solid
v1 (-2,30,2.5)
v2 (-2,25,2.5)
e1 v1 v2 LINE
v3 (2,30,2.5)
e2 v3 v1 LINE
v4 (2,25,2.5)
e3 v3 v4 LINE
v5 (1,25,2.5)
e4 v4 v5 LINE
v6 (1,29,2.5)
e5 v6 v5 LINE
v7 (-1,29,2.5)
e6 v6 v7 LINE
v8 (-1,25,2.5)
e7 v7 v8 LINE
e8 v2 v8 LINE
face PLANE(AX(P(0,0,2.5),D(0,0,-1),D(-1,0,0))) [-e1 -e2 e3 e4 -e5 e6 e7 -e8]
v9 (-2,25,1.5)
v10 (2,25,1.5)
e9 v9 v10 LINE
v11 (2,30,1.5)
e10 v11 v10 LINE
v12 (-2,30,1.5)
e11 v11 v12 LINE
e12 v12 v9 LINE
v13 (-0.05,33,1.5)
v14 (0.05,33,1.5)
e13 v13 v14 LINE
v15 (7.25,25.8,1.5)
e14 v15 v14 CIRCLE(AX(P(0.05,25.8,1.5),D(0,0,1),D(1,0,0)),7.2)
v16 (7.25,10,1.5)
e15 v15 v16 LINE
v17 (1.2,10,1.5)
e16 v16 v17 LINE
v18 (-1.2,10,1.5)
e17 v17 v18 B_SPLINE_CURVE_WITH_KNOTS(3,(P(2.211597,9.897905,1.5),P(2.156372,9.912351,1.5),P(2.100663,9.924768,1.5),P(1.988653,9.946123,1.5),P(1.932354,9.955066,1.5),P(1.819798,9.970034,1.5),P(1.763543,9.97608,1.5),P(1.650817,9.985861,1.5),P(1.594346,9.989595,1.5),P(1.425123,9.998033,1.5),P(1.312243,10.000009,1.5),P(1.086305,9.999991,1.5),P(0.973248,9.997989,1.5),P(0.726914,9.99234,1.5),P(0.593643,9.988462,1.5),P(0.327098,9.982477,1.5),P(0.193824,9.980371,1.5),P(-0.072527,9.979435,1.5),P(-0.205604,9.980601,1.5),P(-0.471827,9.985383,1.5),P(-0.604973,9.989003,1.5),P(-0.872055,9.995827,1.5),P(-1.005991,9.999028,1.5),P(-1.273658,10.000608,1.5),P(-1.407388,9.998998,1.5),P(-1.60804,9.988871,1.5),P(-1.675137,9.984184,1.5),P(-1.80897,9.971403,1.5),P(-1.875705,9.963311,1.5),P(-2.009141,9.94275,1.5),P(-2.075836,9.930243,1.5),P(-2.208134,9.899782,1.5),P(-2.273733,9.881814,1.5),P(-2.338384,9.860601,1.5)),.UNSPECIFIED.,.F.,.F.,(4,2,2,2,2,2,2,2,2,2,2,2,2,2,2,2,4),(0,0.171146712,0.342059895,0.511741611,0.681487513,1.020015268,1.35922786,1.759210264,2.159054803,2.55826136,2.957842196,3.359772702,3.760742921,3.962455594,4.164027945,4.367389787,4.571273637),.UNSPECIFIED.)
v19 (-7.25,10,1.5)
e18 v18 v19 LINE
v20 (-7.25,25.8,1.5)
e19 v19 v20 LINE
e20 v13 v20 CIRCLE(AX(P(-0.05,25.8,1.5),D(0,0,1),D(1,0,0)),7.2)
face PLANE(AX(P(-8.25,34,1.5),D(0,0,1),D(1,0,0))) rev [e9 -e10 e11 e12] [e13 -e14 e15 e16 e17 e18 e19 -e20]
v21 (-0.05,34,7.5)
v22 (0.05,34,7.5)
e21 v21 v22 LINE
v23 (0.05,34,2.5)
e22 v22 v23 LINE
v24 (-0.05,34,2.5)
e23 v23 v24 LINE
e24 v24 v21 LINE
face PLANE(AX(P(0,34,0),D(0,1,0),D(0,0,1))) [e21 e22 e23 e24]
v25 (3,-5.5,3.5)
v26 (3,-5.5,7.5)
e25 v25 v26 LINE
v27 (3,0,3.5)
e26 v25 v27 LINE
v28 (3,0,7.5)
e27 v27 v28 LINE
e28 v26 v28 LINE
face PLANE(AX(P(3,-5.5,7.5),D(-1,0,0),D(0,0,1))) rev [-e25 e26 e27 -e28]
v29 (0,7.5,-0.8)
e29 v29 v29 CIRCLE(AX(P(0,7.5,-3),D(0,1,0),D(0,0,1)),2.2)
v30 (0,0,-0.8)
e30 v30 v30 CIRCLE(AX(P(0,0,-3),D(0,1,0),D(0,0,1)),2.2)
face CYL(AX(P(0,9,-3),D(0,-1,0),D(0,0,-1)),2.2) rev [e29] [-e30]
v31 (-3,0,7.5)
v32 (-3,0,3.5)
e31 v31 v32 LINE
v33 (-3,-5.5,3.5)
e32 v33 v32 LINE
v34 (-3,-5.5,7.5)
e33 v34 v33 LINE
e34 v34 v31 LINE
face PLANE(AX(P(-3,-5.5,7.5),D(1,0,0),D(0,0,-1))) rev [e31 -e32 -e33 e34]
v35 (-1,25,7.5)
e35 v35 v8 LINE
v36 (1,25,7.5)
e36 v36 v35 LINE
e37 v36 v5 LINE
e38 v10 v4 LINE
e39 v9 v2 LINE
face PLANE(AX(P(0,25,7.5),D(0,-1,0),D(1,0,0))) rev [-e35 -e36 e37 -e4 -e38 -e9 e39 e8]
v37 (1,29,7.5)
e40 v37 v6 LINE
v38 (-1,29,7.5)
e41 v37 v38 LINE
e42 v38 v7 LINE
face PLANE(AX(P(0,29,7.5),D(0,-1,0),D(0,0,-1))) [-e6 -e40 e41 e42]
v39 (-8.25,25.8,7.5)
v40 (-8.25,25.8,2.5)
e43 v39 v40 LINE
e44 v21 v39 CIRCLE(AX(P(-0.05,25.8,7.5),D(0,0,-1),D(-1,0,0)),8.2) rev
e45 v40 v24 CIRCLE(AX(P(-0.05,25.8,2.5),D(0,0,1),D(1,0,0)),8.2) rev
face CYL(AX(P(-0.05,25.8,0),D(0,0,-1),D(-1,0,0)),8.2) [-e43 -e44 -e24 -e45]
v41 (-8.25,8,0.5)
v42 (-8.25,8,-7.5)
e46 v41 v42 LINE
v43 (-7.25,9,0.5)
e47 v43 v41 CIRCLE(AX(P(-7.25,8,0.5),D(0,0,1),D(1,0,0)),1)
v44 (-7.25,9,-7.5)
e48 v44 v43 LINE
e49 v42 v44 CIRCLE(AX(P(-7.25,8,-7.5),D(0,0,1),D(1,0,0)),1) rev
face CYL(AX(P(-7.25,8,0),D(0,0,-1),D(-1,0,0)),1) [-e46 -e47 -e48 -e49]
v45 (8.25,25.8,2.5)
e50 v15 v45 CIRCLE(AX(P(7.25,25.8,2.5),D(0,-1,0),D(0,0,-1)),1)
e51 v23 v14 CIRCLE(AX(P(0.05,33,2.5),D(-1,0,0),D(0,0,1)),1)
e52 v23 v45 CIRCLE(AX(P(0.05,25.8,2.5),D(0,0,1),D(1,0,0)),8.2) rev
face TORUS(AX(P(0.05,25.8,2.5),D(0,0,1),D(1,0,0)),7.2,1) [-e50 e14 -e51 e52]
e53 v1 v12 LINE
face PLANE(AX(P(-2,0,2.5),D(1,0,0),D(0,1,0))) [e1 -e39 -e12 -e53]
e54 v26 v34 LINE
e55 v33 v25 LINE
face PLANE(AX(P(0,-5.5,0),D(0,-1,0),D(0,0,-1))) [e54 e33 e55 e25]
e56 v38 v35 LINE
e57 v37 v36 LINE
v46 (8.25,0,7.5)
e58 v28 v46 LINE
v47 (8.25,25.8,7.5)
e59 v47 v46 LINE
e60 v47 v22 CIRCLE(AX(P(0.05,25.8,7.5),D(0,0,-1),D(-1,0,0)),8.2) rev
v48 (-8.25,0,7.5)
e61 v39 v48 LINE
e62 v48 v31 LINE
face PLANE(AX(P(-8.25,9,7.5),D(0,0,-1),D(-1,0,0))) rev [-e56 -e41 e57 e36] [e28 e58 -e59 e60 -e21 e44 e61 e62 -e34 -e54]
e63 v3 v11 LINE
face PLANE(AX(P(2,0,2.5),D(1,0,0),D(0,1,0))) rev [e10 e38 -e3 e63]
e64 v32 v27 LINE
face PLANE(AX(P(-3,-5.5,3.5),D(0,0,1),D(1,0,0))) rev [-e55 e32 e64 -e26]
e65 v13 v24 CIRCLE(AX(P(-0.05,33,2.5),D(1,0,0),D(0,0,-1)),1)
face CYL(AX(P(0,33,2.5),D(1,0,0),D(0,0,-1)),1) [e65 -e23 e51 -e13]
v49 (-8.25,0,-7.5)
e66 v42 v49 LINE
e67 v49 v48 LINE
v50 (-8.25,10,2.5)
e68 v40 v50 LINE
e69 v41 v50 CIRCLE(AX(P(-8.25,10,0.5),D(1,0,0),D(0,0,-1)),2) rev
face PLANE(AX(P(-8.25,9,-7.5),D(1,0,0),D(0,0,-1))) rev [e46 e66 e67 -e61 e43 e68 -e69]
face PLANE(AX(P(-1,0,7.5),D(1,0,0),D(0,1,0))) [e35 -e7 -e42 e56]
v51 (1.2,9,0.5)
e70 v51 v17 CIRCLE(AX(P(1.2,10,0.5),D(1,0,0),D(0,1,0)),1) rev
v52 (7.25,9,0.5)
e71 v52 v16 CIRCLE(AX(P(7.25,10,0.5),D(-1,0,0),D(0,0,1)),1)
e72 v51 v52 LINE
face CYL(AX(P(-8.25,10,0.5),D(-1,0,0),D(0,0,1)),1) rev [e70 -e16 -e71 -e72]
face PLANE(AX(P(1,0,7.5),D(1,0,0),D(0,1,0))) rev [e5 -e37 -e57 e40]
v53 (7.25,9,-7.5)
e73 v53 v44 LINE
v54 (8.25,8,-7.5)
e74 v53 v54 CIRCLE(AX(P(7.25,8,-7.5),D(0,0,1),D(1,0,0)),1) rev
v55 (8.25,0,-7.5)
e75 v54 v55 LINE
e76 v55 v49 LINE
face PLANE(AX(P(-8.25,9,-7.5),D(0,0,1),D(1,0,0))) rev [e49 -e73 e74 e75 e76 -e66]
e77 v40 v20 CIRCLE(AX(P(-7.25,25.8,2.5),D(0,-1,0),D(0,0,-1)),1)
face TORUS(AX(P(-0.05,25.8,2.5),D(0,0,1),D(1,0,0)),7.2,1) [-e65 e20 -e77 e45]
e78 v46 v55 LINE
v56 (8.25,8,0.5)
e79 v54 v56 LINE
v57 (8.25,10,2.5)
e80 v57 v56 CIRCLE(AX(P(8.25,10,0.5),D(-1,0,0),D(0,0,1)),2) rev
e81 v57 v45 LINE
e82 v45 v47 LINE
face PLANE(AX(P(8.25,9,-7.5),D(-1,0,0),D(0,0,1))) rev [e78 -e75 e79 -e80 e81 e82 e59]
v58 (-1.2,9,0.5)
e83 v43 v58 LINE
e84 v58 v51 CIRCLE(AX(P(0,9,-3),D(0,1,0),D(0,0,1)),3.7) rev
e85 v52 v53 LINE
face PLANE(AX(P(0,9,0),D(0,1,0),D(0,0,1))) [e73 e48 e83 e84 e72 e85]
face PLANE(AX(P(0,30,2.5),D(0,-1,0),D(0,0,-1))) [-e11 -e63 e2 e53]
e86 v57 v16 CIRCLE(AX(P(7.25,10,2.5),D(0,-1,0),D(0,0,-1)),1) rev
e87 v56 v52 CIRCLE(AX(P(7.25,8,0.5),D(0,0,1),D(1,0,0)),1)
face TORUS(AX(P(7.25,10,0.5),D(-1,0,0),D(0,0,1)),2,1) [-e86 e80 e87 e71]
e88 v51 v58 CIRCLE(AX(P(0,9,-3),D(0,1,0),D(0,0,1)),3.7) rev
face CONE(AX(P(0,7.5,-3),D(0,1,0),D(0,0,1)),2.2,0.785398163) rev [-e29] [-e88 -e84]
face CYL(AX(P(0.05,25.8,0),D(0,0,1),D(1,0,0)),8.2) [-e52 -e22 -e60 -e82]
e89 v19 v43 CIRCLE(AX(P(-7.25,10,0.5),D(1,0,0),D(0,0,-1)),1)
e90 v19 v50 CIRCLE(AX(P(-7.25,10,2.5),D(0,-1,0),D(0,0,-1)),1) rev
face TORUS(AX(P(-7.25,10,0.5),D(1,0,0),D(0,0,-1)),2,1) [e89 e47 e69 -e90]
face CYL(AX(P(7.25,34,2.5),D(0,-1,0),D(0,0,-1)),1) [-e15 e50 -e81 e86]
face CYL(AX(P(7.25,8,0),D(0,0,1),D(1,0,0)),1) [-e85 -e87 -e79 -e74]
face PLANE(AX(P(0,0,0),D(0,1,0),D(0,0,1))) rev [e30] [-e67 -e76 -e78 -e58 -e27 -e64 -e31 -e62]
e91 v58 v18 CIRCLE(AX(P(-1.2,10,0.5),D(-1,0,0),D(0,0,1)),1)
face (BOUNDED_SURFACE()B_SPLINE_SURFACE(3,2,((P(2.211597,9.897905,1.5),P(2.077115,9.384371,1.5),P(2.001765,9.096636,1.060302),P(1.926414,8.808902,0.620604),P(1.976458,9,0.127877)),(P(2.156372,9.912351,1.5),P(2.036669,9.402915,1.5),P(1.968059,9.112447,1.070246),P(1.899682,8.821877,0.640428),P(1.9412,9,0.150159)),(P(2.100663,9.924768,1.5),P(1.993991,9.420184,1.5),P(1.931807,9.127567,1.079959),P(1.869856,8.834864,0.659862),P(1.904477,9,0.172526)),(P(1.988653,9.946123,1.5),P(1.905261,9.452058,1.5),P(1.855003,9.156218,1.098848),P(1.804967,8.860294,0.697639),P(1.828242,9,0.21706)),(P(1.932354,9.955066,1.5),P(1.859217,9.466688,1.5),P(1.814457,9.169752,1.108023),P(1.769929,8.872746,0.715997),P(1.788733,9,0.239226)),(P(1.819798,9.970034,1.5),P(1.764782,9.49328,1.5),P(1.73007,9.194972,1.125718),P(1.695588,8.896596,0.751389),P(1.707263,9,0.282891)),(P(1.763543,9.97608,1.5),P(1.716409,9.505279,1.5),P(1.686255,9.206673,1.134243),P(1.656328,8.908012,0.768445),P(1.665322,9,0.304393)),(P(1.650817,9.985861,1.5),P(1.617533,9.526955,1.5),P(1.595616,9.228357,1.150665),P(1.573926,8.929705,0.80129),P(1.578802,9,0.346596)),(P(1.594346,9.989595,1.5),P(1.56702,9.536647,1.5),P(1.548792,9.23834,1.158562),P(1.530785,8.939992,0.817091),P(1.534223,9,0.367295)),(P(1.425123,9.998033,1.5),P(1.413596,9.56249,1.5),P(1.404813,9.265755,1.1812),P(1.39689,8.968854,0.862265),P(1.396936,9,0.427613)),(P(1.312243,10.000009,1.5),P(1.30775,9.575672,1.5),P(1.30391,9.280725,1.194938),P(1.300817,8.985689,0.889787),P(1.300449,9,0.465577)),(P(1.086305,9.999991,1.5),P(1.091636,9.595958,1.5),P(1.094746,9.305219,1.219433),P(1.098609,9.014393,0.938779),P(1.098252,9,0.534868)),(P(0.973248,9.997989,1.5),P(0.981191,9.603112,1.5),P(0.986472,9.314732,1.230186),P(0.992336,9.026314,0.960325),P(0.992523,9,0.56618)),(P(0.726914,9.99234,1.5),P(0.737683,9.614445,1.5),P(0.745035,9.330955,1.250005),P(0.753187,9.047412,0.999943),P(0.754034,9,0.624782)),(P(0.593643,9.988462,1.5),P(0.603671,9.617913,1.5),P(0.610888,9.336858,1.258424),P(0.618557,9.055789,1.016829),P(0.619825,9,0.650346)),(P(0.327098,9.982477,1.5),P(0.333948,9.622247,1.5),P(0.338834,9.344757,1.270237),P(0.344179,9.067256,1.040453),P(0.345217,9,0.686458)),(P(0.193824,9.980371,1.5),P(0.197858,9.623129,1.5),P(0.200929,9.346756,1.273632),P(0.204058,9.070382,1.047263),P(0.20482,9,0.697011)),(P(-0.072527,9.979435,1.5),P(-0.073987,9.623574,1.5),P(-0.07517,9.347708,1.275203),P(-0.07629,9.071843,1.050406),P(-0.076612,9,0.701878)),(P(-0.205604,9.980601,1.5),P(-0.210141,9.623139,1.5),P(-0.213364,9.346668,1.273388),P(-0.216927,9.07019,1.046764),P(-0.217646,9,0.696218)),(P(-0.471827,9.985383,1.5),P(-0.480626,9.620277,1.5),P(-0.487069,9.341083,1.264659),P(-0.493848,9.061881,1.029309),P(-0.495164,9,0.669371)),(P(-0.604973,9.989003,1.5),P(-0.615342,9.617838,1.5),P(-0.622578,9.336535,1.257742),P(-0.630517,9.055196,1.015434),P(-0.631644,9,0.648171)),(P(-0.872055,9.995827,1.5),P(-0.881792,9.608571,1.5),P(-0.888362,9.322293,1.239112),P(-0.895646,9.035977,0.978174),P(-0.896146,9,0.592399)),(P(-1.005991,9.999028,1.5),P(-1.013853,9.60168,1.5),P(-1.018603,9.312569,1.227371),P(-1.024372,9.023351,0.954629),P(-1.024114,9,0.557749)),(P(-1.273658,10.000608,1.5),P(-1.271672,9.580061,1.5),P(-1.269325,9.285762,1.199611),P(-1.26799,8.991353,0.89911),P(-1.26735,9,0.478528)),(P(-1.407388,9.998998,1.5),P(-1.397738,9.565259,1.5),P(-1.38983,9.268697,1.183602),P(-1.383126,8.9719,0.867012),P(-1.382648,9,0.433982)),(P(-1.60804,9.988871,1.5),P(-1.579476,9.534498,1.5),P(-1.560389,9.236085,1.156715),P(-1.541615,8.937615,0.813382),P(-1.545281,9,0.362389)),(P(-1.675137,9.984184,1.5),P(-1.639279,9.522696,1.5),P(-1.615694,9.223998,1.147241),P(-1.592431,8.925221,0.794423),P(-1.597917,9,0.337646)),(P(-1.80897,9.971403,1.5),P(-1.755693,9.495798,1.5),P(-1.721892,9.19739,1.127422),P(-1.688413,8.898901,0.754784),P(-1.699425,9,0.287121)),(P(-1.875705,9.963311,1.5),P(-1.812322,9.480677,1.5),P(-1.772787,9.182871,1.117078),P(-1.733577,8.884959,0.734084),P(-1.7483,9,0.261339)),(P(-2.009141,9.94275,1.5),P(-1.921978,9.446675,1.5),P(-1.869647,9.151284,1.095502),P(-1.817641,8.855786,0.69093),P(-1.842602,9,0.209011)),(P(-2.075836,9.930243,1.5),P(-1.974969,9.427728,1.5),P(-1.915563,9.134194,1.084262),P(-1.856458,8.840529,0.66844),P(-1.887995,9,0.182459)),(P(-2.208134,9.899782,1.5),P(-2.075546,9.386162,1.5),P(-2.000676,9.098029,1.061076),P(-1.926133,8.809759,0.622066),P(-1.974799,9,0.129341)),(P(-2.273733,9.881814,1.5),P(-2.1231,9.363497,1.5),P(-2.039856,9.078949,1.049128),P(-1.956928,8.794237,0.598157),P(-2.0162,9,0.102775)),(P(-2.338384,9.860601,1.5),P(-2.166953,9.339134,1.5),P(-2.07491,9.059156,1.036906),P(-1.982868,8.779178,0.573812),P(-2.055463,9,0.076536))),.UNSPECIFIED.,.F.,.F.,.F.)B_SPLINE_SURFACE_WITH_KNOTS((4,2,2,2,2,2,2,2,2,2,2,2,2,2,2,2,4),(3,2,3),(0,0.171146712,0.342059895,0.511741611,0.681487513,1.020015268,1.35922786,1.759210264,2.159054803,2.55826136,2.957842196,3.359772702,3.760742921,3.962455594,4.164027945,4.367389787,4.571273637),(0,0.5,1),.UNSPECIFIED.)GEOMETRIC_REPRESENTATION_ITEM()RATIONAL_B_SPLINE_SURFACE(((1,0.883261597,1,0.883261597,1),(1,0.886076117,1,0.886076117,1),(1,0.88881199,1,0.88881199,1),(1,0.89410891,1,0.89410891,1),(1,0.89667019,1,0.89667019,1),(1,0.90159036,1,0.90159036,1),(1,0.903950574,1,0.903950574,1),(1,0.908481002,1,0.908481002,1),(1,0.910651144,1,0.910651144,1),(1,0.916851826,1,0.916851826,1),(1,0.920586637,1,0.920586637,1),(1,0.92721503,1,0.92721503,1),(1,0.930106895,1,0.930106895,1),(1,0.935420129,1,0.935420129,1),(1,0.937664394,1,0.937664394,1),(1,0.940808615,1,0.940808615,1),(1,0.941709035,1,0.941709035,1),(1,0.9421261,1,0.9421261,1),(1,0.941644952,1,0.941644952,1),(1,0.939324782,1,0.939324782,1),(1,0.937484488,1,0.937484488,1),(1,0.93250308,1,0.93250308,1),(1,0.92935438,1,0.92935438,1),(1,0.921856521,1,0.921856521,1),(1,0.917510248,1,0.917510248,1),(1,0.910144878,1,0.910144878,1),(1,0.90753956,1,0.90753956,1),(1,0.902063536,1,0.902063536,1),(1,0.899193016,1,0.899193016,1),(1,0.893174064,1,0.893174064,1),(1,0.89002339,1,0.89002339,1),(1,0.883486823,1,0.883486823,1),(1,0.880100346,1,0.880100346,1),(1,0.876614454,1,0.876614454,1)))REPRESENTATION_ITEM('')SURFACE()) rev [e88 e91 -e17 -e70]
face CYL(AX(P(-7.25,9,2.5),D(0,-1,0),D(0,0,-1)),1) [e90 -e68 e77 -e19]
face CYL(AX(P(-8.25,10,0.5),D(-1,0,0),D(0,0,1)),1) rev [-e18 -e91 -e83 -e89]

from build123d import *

# Parameters (mm, degrees)
SKETCH1_W               = 16.5
SKETCH1_H               = 15
SKETCH1_R               = 2.2
BOSS_EXTRUDE1_DEPTH     = 9
CHAMFER1_SIZE           = 1.5
SKETCH2_W               = 16.5
SKETCH2_H               = 6
BOSS_EXTRUDE2_DEPTH     = 25
CUT_EXTRUDE2_DEPTH      = 37.125648783
CUT_EXTRUDE2_DEPTH_BACK = 37.125648783
SKETCH4_W               = 1
SKETCH4_H               = 4
SKETCH4_3_W             = 4
SKETCH4_3_H             = 6
SKETCH4_3_W_2           = 2
SKETCH4_3_H_2           = 4
CUT_EXTRUDE3_DEPTH      = 1
FILLET1_R               = 1
SKETCH7_W               = 4
SKETCH7_H               = 1
BOSS_EXTRUDE4_DEPTH     = 1
FILLET2_R               = 8.2
SKETCH8_W               = 6
SKETCH8_H               = 4
BOSS_EXTRUDE5_DEPTH     = 5.5


with BuildPart() as part:
    # Sketch1 → Boss-Extrude1 (new body)
    with BuildSketch(Plane(origin=(0, 0, 0), x_dir=(1, 0, 0), z_dir=(0, 1, 0))):
        Rectangle(SKETCH1_W, SKETCH1_H)
        with Locations(Location((0, 3, 0), (0, 0, 270))):
            Circle(SKETCH1_R, mode=Mode.SUBTRACT)
    extrude(amount=BOSS_EXTRUDE1_DEPTH)

    # Chamfer1
    chamfer1_edges = [part.edges().sort_by_distance(p)[0] for p in [
        (0, 9, -5.2),
    ]]
    chamfer(chamfer1_edges, length=CHAMFER1_SIZE)

    # Sketch2 → Boss-Extrude2 (add)
    with BuildSketch(Plane(origin=(0, 9, 0), x_dir=(1, 0, 0), z_dir=(0, 1, 0))):
        with Locations((0, -4.5)):
            Rectangle(SKETCH2_W, SKETCH2_H)
    extrude(amount=BOSS_EXTRUDE2_DEPTH)

    # Sketch4 → Cut-Extrude2 (cut, two sides: drawn at the far end of the back side and taken through both)
    with BuildSketch(Plane(origin=(0, 0, 1.5), x_dir=(-1, 0, 0), z_dir=(0, 0, -1)).offset(-CUT_EXTRUDE2_DEPTH_BACK)):
        with Locations((0.5, 27)):
            Rectangle(SKETCH4_W, SKETCH4_H)
        with Locations((-0.5, 27)):
            Rectangle(SKETCH4_W, SKETCH4_H)
    extrude(amount=CUT_EXTRUDE2_DEPTH + CUT_EXTRUDE2_DEPTH_BACK, mode=Mode.SUBTRACT)

    # Sketch4<3> → Cut-Extrude3 (cut)
    with BuildSketch(Plane(origin=(0, 0, 1.5), x_dir=(-1, 0, 0), z_dir=(0, 0, -1))):
        with Locations((0, 27)):
            Rectangle(SKETCH4_3_W, SKETCH4_3_H)
        with Locations((0, 27)):
            Rectangle(SKETCH4_3_W_2, SKETCH4_3_H_2, mode=Mode.SUBTRACT)
    extrude(amount=-CUT_EXTRUDE3_DEPTH, mode=Mode.SUBTRACT)

    # Fillet1
    fillet1_edges = [part.edges().sort_by_distance(p)[0] for p in [
        (-8.25, 9, -3),
        (8.25, 9, -3),
        (-8.25, 21.5, 1.5),
        (0, 9, 1.5),
        (8.25, 21.5, 1.5),
        (0, 34, 1.5),
    ]]
    fillet(fillet1_edges, radius=FILLET1_R)

    # Sketch7 → Boss-Extrude4 (add)
    with BuildSketch(Plane(origin=(0, 0, 2.5), x_dir=(-1, 0, 0), z_dir=(0, 0, -1))):
        with Locations((0, 24.5)):
            Rectangle(SKETCH7_W, SKETCH7_H)
    extrude(amount=BOSS_EXTRUDE4_DEPTH)

    # Fillet2
    # the kernel refuses this fillet: 8.2 mm, written as the material it takes off along each edge
    with BuildSketch(Plane(origin=(-0.05, 25.8, 1.5), x_dir=(-1, 0, 0), z_dir=(0, -1, 0))) as fillet2_piece_1:
        with BuildLine():
            CenterArc((7.2, -1), 1, 0, 90)
            Line((8.2, -1), (8.2, 0))
            Line((8.2, 0), (7.2, 0))
        make_face()
    revolve(axis=Axis((-0.05, 25.8, 1.5), (0, 0, -1)), revolution_arc=90, mode=Mode.SUBTRACT)
    with BuildSketch(Plane(origin=(0.05, 25.8, 1.5), x_dir=(0, 1, 0), z_dir=(-1, 0, 0))) as fillet2_piece_2:
        with BuildLine():
            CenterArc((7.2, -1), 1, 0, 90)
            Line((8.2, -1), (8.2, 0))
            Line((8.2, 0), (7.2, 0))
        make_face()
    revolve(axis=Axis((0.05, 25.8, 1.5), (0, 0, -1)), revolution_arc=90, mode=Mode.SUBTRACT)
    with BuildSketch(Plane(origin=(8.25, 34, 1.5), x_dir=(0, -1, 0), z_dir=(0, 0, 1)), Plane(origin=(-8.25, 34, 28), x_dir=(0, -1, 0), z_dir=(0, 0, -1))) as fillet2_piece_3:
        with BuildLine():
            CenterArc((FILLET2_R, -FILLET2_R), FILLET2_R, 90, 90)
            Line((0, -FILLET2_R), (0, 0))
            Line((0, 0), (FILLET2_R, 0))
        make_face()
    extrude(amount=26.5, mode=Mode.SUBTRACT)

    # Sketch8 → Boss-Extrude5 (add)
    with BuildSketch(Plane.XZ):
        with Locations((0, 5.5)):
            Rectangle(SKETCH8_W, SKETCH8_H)
    extrude(amount=BOSS_EXTRUDE5_DEPTH)


solid = part.part
